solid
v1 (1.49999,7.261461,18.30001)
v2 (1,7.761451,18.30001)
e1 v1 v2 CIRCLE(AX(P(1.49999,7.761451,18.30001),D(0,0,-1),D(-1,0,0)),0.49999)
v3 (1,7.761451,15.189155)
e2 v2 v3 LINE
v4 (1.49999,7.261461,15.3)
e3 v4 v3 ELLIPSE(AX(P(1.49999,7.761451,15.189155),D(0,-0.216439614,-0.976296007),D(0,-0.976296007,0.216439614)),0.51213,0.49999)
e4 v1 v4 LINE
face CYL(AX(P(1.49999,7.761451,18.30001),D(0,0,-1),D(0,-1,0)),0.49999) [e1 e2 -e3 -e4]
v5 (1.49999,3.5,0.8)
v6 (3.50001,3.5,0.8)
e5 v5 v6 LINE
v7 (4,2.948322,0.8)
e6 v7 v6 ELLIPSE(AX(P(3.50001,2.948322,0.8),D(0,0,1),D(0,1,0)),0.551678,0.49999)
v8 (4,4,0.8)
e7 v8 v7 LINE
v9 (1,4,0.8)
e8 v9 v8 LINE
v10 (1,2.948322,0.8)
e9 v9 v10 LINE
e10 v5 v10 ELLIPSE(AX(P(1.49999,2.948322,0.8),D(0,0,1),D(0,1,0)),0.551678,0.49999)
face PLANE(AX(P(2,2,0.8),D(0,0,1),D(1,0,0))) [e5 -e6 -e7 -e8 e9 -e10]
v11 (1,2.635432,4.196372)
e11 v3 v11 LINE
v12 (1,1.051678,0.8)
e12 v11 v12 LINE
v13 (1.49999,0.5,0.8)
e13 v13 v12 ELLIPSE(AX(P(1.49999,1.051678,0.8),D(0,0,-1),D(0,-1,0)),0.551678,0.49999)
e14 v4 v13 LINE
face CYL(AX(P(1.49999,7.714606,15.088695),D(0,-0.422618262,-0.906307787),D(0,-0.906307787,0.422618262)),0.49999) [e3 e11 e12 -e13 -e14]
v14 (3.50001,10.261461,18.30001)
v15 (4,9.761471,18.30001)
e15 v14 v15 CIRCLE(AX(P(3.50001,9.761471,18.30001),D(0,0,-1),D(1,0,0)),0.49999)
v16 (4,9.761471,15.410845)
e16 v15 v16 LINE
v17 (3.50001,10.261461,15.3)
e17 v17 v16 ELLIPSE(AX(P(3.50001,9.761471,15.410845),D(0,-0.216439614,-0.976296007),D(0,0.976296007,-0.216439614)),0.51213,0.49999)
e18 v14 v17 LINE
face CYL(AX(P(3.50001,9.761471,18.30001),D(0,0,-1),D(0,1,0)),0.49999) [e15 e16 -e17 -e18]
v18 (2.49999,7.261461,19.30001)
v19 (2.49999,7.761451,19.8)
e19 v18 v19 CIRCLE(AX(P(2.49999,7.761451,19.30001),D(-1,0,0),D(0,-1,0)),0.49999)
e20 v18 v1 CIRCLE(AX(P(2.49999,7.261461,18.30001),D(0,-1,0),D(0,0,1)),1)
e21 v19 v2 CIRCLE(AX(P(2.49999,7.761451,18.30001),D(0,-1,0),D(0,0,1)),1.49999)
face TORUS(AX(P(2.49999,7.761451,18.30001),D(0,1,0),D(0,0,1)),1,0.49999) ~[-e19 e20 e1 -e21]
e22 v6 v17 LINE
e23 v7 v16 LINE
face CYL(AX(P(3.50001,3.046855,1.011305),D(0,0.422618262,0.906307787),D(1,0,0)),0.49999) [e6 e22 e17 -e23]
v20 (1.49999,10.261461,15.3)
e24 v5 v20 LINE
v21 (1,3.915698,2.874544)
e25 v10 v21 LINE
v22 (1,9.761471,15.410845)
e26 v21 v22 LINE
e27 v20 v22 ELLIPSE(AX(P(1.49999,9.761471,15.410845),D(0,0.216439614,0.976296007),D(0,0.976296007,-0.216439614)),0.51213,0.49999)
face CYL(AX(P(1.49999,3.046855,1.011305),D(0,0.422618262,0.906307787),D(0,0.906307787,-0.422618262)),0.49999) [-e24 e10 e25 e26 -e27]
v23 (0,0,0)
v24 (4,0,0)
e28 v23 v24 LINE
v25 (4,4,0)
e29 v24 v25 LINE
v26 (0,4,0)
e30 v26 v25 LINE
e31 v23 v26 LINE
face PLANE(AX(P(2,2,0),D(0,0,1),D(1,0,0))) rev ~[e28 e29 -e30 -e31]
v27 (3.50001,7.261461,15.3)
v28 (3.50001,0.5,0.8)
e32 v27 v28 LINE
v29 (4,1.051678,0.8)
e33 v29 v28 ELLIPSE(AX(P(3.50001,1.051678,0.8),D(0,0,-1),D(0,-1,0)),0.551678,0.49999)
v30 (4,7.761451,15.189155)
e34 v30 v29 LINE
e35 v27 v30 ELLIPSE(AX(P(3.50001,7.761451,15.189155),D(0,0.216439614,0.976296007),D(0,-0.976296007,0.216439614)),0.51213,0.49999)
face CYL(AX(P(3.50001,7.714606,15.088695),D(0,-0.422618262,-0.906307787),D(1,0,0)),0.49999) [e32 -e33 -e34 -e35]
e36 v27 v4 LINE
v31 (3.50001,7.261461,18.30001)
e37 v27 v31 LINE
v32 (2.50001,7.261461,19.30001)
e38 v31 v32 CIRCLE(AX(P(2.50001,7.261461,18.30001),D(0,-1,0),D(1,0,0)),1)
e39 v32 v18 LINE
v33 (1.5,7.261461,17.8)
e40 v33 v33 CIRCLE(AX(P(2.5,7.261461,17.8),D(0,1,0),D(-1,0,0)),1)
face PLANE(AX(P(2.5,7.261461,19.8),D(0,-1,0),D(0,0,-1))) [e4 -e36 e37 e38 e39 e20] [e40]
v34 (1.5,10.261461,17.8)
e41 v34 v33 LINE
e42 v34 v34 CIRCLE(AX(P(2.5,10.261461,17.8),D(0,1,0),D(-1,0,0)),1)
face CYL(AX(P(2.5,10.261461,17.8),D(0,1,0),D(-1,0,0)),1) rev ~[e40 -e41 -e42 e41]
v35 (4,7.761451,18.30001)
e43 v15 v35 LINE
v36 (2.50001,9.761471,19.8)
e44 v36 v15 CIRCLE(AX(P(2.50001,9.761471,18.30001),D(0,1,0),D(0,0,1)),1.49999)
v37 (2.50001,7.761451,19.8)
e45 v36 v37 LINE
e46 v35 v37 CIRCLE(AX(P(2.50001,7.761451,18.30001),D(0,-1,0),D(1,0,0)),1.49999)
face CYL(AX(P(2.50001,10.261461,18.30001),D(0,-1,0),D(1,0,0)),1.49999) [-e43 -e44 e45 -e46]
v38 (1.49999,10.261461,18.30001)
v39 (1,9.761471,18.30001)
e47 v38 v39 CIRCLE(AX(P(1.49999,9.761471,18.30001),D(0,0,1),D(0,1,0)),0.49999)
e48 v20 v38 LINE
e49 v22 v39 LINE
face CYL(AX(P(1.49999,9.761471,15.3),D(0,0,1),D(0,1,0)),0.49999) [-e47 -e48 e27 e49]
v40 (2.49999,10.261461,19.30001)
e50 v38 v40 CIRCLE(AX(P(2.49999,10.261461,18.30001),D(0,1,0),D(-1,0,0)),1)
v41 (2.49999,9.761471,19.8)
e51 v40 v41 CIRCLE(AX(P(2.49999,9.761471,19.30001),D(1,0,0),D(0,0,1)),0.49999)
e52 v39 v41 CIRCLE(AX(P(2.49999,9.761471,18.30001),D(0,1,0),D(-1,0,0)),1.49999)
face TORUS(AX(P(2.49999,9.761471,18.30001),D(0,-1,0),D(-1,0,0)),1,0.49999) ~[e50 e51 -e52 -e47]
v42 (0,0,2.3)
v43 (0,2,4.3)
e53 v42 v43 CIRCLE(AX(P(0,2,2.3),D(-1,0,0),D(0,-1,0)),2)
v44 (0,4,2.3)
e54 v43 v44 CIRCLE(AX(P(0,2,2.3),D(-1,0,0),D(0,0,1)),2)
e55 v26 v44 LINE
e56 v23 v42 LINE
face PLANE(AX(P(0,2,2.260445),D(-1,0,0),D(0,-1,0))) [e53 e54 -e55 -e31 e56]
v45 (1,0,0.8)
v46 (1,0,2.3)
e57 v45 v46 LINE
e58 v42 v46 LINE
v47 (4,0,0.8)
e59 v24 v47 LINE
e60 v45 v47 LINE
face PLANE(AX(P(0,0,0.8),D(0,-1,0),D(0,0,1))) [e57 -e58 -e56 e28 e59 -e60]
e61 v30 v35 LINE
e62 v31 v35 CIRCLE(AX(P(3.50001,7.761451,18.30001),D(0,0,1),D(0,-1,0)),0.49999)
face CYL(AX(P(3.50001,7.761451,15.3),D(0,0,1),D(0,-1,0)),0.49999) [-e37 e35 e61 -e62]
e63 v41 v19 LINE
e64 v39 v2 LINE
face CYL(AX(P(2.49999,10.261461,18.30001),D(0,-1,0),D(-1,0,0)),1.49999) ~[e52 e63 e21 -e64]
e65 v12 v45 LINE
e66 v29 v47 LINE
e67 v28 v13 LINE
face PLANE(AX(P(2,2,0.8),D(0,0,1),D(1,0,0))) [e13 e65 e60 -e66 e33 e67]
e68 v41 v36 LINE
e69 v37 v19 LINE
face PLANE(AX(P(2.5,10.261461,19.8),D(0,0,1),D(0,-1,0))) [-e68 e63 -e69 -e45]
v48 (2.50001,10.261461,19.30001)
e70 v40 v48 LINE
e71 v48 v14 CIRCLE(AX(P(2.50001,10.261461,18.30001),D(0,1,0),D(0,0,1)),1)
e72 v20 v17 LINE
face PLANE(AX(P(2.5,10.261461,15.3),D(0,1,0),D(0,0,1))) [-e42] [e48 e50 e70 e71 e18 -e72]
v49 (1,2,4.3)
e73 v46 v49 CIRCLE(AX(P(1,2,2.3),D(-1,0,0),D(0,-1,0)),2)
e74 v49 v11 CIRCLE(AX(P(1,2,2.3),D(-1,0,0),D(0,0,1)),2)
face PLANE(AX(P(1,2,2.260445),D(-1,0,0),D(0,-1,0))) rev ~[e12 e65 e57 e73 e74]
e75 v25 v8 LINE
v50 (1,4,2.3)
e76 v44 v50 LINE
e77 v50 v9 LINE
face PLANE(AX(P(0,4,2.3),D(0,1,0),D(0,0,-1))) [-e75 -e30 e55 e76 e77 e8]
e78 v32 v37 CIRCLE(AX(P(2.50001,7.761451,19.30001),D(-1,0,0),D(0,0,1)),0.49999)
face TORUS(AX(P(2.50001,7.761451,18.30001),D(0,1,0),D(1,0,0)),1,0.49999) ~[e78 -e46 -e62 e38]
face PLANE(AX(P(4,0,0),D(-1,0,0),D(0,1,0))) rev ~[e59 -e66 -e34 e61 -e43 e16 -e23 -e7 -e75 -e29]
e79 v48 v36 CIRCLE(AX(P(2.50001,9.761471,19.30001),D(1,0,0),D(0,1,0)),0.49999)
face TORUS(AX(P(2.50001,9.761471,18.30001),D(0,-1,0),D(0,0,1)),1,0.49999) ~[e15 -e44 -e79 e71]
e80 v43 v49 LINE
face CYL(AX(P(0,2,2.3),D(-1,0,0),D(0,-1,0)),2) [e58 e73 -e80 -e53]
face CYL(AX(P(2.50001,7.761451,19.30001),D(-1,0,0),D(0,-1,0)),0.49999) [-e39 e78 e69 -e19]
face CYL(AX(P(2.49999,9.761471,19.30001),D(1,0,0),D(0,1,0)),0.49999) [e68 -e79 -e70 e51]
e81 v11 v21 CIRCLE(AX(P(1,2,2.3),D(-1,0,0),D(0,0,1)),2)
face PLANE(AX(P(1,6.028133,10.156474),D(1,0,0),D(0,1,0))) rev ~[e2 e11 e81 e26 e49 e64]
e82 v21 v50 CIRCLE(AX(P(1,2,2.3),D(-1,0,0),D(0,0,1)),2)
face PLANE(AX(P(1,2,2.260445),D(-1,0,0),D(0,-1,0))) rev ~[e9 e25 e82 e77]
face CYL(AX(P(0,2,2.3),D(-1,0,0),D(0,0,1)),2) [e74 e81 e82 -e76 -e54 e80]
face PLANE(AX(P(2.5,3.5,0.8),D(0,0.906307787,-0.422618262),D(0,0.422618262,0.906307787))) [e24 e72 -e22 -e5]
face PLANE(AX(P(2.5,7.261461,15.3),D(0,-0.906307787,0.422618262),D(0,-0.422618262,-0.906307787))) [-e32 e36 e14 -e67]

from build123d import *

# Parameters (mm, degrees)
F0_W      = 4
F0_H      = 4
F1_DEPTH  = 0.8
F4_DEPTH  = 1.5
F5_R      = 1
F6_DEPTH  = 10.2624610432
F7_R      = 1.49999
F8_R      = 0.49999
F10_DEPTH = 1


# Not quite as in the source:
# - a fillet or chamfer is up to 0.001 mm smaller than in the source, because OpenCascade refuses the exact size


with BuildPart() as f1:
    # F0 (on Top) → F1 (new body)
    with BuildSketch(Plane.XY):
        with Locations((2, 2)):
            Rectangle(F0_W, F0_H)
    extrude(amount=F1_DEPTH)

    # F3 (on offset) → F4 (join, symmetric)
    with BuildSketch(Plane.YZ.offset(2.5)):
        Polygon((0.5, 0.8), (3.5, 0.8), (10.2614610432, 15.3), (10.2614610432, 19.8), (7.2614610432, 19.8), (7.2614610432, 15.3), align=None)
    extrude(amount=F4_DEPTH, both=True)

    # F5 (on face) → F6 (cut, through all)
    with BuildSketch(Plane(origin=(0, 10.2614610432, 0), x_dir=(-1, 0, 0), z_dir=(0, 1, 0))):
        with Locations((-2.5, 17.8)):
            Circle(F5_R)
    extrude(amount=-F6_DEPTH, mode=Mode.SUBTRACT)

    # F7 (radius 1.5 in the source; OpenCascade refuses exactly that, so slightly less here)
    f7_edges = [f1.edges().sort_by_distance(p)[0] for p in [
        (1, 8.761461, 19.8),
        (4, 8.761461, 19.8),
    ]]
    fillet(f7_edges, radius=F7_R)

    # F8 (radius 0.5 in the source; OpenCascade refuses exactly that, so slightly less here)
    f8_edges = [f1.edges().sort_by_distance(p)[0] for p in [
        (1, 6.880731, 8.05),
        (1, 10.261461, 16.800005),
        (3.560663, 10.261461, 19.360663),
        (4, 6.880731, 8.05),
        (1, 3.880731, 8.05),
        (1, 7.261461, 16.800005),
        (4, 3.880731, 8.05),
    ]]
    fillet(f8_edges, radius=F8_R)

    # F9 (on face) → F10 (join)
    with BuildSketch(Plane(origin=(0, 0, 0), x_dir=(0, -1, 0), z_dir=(-1, 0, 0))):
        with BuildLine():
            Line((-4, 2.3), (-4, 0.8))
            Line((-4, 0.8), (0, 0.8))
            Line((0, 0.8), (0, 2.3))
            ThreePointArc((0, 2.3), (-0.5857864376, 3.7142135624), (-2, 4.3))
            ThreePointArc((-2, 4.3), (-3.4142135624, 3.7142135624), (-4, 2.3))
        make_face()
    extrude(amount=-F10_DEPTH)


solid = f1.part
